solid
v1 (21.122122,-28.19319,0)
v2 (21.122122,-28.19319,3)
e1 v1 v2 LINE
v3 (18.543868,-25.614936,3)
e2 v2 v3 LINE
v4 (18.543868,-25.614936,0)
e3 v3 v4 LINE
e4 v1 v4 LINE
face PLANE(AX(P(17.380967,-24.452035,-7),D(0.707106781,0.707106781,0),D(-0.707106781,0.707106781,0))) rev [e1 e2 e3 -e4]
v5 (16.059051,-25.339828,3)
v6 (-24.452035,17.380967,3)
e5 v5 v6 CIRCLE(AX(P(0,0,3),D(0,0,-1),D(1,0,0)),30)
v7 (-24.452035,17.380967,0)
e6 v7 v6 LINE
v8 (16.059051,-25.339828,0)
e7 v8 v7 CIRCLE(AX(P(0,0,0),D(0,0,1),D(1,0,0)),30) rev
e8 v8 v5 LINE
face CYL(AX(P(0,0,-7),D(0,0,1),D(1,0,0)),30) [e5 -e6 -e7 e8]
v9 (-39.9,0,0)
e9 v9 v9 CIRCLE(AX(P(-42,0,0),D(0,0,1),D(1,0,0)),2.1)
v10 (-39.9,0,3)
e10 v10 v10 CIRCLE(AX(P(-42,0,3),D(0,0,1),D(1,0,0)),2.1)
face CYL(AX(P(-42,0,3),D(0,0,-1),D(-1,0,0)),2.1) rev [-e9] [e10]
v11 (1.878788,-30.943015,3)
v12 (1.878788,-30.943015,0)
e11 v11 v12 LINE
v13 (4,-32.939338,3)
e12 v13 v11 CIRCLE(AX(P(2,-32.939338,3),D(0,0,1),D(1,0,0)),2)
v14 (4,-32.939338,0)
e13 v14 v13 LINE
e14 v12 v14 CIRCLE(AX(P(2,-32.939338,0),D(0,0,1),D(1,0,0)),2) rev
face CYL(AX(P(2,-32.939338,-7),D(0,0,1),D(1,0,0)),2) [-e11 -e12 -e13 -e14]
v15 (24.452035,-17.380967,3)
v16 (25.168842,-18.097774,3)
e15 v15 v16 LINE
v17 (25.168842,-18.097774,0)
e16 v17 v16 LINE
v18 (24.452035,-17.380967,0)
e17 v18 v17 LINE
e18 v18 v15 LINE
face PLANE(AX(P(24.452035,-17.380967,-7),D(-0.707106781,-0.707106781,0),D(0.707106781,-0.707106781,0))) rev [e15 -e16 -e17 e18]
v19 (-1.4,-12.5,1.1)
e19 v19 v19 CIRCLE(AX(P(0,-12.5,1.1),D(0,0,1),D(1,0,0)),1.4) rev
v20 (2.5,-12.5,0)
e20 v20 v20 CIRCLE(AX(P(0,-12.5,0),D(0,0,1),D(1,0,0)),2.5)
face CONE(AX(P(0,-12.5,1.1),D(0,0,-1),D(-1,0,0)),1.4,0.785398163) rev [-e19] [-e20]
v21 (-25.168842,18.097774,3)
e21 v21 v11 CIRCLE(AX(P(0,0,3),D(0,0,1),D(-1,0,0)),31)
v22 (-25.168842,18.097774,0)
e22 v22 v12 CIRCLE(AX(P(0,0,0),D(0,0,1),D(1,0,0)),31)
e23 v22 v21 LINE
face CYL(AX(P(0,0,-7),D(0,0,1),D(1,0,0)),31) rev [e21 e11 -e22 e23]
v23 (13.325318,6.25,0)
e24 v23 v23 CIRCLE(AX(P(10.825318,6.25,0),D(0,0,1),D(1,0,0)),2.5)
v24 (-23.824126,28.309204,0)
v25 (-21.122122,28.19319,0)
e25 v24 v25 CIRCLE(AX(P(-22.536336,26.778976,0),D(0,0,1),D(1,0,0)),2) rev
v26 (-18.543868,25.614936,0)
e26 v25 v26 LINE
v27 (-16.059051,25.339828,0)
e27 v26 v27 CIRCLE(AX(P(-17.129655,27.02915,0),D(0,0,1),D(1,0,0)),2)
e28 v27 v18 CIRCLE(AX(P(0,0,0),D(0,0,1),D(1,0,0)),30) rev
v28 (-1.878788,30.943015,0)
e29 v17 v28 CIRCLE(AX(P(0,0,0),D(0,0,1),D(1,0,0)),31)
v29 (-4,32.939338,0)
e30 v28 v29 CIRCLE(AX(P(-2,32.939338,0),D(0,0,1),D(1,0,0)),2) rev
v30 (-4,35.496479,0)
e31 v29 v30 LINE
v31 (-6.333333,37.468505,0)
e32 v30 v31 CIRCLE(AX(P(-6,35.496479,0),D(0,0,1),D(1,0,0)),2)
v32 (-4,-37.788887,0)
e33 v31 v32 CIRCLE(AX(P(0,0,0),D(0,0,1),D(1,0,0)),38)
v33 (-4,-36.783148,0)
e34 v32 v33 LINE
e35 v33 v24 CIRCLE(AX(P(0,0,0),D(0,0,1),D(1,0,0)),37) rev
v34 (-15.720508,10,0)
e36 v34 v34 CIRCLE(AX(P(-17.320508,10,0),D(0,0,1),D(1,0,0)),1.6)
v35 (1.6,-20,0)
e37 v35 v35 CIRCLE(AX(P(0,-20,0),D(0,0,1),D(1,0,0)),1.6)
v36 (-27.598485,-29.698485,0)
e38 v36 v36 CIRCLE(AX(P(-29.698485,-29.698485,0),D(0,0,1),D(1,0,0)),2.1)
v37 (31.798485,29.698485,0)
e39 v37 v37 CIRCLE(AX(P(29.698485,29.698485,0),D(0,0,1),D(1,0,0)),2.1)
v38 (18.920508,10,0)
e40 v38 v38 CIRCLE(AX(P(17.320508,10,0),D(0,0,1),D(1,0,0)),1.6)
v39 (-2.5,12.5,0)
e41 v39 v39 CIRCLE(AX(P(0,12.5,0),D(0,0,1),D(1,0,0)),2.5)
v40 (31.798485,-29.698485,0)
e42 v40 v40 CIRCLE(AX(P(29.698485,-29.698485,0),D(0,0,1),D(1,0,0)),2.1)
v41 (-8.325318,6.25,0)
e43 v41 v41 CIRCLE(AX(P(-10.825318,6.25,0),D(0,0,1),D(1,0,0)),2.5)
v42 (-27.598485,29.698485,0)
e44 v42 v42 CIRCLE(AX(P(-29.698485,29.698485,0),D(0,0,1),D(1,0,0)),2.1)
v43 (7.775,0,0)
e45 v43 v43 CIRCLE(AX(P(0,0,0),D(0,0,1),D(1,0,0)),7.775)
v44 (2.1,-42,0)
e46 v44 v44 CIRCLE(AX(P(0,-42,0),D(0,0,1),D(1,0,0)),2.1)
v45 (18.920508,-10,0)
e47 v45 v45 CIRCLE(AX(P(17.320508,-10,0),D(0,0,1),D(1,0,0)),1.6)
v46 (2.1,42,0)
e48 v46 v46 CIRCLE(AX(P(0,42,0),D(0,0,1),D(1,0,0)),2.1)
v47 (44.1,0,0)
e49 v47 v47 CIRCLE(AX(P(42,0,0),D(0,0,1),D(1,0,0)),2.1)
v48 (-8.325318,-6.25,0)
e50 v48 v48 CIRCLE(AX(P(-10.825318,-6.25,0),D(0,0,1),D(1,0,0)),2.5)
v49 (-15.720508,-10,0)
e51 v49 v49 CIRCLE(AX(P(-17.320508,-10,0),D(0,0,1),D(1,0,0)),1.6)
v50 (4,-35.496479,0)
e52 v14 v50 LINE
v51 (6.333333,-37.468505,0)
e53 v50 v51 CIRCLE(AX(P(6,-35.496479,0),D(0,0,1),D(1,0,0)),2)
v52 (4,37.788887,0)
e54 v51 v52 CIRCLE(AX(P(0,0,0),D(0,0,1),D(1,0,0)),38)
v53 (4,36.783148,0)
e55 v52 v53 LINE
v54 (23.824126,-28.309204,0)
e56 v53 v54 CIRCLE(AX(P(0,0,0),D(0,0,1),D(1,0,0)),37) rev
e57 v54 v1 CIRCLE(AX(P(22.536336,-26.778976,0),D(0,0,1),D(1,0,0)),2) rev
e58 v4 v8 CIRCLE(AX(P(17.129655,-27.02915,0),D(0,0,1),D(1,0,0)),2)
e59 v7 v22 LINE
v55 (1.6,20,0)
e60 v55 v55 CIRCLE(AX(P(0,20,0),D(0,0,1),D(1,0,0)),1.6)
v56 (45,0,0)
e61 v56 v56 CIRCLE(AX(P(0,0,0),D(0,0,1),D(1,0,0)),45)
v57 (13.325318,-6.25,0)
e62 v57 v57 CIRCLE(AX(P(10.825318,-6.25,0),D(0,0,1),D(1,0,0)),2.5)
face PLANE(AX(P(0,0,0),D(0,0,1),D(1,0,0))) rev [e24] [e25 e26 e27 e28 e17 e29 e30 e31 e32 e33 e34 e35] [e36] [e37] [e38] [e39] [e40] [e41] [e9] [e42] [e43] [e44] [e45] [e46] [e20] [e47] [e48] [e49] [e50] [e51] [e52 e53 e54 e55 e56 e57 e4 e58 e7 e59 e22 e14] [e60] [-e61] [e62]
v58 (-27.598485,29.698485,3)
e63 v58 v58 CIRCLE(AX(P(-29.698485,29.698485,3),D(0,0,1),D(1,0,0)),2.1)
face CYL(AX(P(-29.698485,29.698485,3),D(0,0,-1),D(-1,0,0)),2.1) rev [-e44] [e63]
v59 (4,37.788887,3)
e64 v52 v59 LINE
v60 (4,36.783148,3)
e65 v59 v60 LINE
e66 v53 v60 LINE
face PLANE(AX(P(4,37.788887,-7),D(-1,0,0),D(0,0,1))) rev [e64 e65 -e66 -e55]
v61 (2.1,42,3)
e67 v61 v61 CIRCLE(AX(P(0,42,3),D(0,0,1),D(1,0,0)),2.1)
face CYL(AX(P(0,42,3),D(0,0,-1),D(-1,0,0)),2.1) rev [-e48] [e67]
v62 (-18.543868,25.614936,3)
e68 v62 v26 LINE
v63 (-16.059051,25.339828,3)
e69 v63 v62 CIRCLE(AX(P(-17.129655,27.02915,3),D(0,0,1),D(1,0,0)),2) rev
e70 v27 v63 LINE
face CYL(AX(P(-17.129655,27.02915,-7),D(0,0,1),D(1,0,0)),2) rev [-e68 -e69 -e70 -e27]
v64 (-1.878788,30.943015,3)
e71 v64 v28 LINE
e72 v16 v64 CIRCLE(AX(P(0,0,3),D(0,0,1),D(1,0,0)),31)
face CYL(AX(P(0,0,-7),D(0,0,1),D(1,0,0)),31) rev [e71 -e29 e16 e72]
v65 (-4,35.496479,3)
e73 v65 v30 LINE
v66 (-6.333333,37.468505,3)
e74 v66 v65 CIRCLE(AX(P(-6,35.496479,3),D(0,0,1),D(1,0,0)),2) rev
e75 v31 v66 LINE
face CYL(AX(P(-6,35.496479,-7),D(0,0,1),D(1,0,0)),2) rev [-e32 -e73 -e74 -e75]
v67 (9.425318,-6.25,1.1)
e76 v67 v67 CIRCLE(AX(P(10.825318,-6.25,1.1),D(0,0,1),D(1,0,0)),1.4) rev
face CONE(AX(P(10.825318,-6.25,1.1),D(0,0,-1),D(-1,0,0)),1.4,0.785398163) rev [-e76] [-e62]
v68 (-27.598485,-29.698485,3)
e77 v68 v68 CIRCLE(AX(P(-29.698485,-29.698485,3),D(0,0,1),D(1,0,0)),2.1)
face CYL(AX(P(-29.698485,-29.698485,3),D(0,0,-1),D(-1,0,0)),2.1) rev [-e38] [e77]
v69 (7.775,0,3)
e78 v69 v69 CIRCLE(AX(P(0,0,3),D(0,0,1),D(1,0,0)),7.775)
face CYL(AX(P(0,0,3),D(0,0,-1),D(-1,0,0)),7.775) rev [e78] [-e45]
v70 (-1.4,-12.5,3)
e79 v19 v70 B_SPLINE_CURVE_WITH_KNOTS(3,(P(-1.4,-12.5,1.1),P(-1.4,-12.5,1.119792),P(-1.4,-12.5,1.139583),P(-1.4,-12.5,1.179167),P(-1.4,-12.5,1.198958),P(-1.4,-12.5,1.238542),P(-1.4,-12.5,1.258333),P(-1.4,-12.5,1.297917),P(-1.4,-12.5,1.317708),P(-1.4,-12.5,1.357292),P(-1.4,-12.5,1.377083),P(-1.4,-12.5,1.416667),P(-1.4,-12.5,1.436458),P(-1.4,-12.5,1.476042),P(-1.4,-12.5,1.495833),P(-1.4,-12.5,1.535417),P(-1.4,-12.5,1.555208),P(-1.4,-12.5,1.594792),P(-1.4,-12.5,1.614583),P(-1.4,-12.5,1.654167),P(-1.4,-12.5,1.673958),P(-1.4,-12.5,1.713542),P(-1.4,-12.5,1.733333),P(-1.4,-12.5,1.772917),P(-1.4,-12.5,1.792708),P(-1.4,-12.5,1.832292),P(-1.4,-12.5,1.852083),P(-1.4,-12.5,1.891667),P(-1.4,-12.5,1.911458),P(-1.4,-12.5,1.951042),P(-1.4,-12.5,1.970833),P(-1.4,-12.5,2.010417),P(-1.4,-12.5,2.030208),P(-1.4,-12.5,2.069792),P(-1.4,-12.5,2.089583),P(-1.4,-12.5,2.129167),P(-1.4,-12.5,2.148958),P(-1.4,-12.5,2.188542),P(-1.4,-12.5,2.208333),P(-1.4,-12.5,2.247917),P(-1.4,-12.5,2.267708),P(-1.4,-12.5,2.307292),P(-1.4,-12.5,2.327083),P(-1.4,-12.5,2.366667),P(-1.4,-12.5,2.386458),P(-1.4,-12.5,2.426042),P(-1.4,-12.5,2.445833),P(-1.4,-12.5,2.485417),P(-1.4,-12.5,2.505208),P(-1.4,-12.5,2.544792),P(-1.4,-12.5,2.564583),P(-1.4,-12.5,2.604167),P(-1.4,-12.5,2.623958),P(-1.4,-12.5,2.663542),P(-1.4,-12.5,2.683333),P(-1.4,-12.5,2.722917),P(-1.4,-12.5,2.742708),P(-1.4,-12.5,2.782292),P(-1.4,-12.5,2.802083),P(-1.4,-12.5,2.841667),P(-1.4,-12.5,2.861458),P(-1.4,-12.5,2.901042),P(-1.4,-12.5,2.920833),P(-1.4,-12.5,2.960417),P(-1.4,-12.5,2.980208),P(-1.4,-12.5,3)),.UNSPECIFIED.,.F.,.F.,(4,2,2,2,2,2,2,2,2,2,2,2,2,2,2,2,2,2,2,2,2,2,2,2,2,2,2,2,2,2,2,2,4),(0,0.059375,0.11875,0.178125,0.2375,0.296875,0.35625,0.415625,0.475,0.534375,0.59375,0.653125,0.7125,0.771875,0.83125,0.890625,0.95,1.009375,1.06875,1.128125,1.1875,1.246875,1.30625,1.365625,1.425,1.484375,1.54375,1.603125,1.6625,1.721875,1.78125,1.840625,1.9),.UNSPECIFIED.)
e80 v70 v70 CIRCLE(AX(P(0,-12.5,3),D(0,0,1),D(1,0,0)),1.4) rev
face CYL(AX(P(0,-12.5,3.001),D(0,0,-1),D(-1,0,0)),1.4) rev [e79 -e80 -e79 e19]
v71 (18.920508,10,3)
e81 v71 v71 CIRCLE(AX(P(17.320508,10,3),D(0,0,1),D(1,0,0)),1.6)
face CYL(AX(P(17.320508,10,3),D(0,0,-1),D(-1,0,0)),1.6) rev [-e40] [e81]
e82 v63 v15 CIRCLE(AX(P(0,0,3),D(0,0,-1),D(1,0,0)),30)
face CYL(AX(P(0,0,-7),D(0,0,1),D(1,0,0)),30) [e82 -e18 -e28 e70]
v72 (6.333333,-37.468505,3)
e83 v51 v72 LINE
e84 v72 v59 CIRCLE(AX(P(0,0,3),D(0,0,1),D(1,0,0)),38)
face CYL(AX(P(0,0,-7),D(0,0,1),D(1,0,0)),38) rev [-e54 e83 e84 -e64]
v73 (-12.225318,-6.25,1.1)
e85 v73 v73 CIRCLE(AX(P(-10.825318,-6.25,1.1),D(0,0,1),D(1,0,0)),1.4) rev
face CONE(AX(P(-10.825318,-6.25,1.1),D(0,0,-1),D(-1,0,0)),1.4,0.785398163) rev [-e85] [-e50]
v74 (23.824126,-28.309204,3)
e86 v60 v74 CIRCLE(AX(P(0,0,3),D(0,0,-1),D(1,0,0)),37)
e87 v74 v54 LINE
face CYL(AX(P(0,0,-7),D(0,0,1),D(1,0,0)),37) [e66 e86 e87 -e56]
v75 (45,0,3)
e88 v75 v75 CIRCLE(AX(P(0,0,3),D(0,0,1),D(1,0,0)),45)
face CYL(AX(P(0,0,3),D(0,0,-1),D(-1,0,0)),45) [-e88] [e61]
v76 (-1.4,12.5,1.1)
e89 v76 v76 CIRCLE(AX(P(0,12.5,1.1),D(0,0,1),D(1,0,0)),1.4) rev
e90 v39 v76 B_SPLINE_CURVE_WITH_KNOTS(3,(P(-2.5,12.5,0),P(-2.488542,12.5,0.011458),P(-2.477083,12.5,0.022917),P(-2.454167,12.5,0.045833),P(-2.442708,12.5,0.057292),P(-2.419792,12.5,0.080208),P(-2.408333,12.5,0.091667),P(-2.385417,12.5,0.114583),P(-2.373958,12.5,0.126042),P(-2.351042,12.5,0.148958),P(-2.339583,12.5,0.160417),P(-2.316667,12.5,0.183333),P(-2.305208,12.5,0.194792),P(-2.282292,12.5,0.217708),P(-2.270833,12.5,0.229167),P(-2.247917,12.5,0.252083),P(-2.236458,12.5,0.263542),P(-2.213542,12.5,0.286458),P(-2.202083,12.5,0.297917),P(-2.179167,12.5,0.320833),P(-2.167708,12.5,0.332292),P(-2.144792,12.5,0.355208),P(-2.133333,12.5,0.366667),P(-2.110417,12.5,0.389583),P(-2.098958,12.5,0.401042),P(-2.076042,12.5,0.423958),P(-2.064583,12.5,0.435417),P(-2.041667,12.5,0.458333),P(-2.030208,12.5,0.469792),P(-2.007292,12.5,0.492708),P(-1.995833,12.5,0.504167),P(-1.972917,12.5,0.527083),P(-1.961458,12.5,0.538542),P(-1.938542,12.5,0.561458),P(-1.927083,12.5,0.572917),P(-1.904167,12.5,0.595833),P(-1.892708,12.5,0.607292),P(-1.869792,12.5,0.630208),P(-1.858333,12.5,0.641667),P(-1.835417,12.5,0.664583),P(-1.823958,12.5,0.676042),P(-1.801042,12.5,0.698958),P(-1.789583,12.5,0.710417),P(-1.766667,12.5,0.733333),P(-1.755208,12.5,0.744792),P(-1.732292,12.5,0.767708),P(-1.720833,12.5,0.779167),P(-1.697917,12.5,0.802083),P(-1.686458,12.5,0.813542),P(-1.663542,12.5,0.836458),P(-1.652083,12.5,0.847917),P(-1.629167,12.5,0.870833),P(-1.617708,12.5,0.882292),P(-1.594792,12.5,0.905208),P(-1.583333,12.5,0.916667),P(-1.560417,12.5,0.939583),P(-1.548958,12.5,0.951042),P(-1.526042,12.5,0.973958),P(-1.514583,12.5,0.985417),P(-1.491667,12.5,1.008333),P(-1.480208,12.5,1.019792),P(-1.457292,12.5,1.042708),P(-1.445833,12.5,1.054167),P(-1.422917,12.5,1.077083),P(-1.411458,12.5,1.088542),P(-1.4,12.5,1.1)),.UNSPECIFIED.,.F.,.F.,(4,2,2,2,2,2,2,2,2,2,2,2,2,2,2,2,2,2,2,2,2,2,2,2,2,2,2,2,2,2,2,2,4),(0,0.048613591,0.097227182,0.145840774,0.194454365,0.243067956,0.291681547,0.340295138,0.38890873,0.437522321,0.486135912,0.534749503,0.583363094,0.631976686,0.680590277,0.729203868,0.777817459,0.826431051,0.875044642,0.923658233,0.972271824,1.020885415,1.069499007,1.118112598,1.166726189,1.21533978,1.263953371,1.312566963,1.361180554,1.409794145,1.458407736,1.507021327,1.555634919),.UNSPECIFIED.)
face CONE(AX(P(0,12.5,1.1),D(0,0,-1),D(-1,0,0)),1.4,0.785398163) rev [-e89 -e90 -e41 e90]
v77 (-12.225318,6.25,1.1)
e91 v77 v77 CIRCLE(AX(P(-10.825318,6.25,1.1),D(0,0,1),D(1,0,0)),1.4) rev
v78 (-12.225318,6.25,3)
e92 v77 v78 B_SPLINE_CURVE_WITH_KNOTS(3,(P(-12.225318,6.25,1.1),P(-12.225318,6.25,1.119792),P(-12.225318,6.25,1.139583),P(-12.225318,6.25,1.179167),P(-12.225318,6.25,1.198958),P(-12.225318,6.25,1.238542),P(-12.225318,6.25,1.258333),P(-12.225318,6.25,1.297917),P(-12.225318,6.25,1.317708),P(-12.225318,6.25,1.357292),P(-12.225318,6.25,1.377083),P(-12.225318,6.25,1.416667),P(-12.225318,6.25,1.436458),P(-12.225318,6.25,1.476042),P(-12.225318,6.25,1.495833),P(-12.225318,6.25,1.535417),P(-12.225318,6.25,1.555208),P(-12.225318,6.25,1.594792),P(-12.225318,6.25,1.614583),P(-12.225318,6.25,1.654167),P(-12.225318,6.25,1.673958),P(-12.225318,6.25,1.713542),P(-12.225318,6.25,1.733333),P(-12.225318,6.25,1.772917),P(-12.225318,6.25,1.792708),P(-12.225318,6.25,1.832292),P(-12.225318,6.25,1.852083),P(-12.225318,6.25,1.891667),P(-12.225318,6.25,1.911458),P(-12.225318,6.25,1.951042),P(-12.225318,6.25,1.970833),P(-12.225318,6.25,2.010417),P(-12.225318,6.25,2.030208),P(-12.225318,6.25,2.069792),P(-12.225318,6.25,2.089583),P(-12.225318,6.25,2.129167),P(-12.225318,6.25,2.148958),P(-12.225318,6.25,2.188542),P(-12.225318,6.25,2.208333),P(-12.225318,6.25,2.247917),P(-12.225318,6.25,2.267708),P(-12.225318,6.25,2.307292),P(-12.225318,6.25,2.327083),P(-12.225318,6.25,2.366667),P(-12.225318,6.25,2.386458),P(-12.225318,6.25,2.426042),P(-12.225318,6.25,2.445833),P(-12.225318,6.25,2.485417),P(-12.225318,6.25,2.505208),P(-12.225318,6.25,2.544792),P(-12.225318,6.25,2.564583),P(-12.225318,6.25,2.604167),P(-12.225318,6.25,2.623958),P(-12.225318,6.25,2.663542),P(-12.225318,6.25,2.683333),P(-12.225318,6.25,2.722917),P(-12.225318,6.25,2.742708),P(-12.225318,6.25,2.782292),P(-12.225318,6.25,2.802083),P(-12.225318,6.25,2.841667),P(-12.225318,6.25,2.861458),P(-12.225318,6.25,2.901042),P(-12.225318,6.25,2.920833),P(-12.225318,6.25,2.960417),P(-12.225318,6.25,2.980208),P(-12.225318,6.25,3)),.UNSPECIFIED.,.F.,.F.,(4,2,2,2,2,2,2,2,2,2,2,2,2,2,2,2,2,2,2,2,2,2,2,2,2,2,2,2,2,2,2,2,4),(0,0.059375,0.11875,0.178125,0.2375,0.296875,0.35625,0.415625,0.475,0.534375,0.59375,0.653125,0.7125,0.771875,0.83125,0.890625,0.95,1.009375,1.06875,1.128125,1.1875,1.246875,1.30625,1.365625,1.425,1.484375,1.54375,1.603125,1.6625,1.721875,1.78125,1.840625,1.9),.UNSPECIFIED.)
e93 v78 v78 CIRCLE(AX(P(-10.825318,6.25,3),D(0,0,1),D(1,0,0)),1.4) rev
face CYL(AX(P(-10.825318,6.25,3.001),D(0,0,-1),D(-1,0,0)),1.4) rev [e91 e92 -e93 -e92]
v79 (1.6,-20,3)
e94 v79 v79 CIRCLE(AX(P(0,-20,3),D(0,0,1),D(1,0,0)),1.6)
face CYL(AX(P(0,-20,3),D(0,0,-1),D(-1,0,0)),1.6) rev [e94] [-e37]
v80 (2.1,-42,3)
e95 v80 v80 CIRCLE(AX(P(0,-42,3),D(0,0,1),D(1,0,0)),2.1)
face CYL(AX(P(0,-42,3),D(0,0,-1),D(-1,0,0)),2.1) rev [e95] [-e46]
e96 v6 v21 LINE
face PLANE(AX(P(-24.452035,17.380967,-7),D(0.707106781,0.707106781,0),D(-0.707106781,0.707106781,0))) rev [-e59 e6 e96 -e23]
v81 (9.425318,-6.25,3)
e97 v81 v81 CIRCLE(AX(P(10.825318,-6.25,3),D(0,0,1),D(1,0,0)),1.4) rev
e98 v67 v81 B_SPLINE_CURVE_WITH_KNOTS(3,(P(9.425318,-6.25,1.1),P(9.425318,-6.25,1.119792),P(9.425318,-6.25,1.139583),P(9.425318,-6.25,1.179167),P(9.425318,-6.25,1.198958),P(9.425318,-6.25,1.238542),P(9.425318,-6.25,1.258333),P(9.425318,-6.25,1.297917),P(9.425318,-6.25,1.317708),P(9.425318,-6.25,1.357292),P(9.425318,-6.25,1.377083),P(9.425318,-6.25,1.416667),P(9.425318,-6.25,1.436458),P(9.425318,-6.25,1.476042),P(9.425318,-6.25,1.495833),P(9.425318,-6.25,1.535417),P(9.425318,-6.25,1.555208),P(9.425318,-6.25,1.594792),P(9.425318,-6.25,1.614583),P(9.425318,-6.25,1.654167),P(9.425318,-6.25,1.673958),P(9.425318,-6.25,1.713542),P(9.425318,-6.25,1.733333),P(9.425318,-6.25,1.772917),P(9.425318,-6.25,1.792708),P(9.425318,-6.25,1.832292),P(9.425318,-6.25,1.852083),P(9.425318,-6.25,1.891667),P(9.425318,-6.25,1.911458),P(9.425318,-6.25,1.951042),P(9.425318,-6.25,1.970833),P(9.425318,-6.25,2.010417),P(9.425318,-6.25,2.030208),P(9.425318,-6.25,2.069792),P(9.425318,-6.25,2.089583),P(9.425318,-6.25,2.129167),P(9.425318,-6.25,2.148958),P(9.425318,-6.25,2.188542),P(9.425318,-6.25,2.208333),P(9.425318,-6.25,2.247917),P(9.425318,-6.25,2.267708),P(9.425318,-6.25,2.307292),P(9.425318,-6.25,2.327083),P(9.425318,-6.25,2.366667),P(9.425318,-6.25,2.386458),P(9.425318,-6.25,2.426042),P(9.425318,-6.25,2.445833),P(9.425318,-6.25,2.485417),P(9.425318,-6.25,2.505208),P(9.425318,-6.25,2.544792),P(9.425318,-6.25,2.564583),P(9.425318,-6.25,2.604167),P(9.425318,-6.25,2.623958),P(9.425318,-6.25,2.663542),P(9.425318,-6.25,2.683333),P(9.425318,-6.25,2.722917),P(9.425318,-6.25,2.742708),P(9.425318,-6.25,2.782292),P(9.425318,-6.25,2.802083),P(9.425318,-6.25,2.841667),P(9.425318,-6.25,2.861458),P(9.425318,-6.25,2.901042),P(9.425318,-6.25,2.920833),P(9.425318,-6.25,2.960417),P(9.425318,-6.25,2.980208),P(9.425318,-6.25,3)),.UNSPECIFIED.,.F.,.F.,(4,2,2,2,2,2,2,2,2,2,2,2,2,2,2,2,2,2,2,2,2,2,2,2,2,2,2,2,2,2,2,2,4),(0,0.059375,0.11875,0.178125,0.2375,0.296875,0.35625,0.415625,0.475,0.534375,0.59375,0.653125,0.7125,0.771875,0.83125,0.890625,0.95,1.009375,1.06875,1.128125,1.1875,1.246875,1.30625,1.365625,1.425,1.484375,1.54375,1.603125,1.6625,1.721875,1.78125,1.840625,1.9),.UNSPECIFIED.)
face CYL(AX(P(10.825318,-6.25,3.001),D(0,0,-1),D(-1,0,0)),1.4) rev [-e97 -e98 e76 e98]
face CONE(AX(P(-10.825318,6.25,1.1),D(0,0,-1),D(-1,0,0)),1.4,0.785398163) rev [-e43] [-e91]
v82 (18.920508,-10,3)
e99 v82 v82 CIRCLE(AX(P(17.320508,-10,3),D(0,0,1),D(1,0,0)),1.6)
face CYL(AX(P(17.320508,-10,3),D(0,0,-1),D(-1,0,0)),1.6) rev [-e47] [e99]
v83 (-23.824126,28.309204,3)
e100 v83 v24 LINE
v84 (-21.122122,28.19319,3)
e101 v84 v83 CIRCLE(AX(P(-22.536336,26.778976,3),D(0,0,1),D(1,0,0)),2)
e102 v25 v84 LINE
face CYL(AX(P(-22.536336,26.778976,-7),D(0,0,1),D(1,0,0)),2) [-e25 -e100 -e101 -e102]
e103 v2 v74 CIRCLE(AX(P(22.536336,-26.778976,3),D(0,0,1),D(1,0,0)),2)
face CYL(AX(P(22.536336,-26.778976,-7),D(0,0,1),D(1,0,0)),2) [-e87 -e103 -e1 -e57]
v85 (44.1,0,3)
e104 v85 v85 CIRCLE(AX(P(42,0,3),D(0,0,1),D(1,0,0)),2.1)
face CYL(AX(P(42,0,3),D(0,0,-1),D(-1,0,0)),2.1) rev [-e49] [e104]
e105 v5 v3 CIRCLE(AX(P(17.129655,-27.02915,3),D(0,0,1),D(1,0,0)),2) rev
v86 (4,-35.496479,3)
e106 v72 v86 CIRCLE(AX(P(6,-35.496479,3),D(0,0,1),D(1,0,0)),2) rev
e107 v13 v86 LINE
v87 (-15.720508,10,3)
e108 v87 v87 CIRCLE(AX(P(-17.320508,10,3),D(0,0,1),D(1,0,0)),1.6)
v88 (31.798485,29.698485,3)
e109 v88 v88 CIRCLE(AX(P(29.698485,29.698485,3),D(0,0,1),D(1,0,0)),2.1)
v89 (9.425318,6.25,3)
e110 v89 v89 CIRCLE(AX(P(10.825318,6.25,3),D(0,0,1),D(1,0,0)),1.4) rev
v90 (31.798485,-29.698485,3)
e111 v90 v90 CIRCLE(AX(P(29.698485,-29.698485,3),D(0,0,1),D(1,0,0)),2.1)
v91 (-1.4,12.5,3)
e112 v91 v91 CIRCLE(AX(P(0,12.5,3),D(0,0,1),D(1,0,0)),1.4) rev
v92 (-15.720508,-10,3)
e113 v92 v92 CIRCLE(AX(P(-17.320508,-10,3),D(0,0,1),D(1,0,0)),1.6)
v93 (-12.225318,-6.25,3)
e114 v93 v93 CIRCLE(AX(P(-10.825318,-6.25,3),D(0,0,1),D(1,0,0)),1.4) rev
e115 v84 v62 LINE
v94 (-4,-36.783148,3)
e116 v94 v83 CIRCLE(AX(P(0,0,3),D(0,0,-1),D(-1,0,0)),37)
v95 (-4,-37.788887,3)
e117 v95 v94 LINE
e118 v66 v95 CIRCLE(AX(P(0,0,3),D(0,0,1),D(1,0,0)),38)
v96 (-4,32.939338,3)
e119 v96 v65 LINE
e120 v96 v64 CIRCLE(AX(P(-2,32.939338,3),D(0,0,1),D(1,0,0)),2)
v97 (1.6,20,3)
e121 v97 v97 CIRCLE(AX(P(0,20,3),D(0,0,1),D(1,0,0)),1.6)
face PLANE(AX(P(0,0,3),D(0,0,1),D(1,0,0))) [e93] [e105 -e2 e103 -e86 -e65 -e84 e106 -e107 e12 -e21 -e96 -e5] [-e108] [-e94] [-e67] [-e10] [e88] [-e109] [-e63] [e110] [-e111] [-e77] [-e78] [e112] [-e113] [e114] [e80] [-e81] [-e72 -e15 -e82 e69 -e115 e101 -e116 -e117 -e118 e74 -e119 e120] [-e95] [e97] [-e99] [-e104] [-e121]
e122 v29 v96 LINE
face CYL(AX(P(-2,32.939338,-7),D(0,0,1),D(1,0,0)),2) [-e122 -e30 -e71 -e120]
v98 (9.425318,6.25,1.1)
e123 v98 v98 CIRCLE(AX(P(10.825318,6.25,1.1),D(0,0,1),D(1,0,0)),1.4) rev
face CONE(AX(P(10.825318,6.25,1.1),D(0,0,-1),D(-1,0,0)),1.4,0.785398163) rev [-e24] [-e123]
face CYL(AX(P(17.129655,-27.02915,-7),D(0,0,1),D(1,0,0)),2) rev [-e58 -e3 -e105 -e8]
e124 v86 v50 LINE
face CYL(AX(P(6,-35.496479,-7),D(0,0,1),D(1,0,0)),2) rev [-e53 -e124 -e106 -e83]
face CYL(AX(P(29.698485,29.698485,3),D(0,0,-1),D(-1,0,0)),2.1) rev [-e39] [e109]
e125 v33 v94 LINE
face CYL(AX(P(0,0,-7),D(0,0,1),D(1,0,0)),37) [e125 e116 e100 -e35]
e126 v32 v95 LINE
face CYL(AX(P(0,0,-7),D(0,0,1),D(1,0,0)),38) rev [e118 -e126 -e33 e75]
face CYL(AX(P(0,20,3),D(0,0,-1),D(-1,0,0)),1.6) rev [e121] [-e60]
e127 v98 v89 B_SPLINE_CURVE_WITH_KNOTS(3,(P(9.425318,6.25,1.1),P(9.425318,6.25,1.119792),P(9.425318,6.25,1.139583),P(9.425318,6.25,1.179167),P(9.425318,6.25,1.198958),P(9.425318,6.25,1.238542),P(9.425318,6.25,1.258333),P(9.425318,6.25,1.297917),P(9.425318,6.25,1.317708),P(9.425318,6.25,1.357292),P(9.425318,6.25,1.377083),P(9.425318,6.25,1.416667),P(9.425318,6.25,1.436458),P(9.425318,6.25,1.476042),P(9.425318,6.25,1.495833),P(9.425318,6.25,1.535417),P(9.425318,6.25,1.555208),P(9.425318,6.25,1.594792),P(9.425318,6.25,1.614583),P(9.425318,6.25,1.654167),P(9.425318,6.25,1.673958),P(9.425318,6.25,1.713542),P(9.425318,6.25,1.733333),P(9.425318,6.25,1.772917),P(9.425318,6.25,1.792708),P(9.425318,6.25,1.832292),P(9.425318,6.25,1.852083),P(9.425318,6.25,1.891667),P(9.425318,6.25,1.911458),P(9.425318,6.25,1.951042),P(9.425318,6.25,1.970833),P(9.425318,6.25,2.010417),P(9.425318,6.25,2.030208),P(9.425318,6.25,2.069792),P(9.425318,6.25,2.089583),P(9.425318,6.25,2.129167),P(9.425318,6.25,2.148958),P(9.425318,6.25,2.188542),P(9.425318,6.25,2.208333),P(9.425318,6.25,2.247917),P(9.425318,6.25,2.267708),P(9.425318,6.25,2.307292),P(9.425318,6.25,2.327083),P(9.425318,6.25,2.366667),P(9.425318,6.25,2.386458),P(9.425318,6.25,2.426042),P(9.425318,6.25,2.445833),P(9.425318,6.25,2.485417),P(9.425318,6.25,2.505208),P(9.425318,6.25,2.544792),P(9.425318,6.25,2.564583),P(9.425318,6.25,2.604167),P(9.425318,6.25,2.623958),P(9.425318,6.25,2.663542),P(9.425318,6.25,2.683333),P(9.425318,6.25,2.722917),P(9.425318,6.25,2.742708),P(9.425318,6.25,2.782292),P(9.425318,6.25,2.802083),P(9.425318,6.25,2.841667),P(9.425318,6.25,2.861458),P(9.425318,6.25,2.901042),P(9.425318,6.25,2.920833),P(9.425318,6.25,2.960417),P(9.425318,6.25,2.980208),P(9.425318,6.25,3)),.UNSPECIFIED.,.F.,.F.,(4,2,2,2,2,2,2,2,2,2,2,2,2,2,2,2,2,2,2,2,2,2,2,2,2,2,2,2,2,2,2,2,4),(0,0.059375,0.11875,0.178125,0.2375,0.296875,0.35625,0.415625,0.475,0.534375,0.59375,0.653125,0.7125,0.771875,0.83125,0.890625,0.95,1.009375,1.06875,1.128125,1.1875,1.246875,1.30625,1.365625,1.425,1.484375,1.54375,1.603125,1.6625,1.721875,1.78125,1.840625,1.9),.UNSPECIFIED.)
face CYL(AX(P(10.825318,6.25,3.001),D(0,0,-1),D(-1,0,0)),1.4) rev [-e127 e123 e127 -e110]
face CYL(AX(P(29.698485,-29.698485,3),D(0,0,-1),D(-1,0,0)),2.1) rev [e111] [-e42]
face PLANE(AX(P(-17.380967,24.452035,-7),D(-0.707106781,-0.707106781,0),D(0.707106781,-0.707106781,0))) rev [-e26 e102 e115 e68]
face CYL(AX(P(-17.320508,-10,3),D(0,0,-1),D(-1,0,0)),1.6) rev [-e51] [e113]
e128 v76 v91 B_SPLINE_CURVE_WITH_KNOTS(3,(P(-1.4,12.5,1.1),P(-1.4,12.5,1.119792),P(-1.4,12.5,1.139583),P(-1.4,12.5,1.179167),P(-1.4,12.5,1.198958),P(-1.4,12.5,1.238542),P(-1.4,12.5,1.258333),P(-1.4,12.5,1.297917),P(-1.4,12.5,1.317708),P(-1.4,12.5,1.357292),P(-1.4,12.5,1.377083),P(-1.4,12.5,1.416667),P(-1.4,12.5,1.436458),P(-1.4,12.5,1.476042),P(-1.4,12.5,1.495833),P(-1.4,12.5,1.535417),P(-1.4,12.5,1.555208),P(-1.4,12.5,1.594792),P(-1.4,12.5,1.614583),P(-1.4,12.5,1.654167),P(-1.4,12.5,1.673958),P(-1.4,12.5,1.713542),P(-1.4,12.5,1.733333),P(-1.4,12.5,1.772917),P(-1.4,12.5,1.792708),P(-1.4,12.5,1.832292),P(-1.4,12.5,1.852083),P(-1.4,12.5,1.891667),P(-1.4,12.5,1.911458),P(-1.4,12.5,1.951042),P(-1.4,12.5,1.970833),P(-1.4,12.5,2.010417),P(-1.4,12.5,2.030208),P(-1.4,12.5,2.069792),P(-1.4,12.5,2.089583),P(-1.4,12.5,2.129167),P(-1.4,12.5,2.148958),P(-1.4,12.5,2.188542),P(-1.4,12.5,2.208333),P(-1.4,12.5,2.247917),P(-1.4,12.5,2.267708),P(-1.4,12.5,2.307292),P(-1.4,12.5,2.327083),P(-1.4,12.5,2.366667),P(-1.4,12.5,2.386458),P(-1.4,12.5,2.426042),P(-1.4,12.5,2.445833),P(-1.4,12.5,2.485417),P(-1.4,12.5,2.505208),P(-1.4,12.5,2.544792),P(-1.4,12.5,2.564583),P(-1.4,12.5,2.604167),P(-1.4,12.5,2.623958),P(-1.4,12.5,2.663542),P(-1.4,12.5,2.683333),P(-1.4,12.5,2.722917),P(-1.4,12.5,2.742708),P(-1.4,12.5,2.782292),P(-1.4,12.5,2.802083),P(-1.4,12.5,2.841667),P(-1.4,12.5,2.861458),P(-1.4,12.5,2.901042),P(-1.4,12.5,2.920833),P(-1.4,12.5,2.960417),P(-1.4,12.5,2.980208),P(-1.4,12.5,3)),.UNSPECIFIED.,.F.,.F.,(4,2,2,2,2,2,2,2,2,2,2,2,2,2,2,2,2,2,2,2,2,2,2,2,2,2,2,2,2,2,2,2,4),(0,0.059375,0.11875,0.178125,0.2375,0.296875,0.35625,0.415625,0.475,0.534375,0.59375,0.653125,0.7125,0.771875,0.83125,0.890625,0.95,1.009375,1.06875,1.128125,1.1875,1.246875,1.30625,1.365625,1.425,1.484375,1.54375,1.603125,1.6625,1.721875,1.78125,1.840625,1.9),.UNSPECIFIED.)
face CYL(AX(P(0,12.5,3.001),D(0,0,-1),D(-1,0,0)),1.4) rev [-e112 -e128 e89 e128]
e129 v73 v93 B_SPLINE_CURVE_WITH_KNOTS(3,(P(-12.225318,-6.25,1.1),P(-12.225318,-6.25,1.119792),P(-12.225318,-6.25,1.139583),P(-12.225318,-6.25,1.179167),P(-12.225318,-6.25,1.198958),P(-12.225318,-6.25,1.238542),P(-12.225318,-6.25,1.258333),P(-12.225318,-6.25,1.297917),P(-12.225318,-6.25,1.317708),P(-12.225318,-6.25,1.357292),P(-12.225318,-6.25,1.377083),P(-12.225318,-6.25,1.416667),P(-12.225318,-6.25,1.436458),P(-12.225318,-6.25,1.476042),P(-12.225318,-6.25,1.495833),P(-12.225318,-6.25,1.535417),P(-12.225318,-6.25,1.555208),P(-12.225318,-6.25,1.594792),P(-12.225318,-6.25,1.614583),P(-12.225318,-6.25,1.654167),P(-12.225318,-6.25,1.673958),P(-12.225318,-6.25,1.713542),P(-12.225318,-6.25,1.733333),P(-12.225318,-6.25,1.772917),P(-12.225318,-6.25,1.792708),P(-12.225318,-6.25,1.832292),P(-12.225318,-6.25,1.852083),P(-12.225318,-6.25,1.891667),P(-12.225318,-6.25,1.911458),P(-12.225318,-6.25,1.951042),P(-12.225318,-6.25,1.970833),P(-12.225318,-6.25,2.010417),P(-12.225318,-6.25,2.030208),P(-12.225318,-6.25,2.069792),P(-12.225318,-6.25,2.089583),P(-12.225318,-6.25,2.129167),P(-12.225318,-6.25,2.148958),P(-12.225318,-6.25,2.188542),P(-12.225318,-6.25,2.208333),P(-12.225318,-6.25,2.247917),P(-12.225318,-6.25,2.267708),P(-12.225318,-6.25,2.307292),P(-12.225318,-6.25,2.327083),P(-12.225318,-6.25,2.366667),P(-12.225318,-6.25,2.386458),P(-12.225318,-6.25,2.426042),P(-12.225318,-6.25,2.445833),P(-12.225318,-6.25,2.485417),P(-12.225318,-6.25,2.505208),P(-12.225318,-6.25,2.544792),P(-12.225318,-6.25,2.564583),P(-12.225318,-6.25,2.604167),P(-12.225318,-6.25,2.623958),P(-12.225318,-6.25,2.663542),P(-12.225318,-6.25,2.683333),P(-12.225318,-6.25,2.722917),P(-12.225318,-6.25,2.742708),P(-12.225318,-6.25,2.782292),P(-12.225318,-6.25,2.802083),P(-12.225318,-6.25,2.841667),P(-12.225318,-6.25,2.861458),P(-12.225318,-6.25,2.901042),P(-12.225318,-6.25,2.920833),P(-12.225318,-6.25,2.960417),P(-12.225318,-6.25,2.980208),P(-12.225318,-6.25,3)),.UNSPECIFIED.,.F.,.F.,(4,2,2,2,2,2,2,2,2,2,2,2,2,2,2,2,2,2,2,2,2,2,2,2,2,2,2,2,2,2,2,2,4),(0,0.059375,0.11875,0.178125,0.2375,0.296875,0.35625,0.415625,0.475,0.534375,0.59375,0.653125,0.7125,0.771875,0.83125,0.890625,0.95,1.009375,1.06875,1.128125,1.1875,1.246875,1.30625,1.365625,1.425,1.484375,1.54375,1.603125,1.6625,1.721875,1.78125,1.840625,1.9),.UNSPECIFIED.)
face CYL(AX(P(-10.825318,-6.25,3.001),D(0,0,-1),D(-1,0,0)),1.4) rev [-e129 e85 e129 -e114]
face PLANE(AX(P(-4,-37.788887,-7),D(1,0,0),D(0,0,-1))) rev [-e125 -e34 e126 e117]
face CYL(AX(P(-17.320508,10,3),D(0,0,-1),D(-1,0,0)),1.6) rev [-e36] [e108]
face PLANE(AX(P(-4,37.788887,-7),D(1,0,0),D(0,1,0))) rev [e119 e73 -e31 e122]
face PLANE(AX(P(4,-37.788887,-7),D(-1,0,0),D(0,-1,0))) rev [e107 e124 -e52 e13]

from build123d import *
from build123d.topology import SkipClean

# Parameters (mm, degrees)
EXTRUDE_1_OUTLINE_R      = 45
EXTRUDE_1_OUTLINE_R_2    = 2.1
EXTRUDE_1_OUTLINE_R_3    = 1.6
EXTRUDE_1_OUTLINE_R_4    = 7.775
EXTRUDE_1_DEPTH          = 3
CUT_EXTRUDE_1_DEPTH      = 10
PATTERN_CIRCULAR_1_COUNT = 2
CUT_EXTRUDE_2_DEPTH      = 10
FILLET_1_R               = 2
CUT_EXTRUDE_3_REACH      = 65.71
SKETCH_4_R               = 1.4
CHAMFER_1_SIZE           = 1.1


# Read off the part's stored shape, not the designer's step: 凸台-拉伸1
with BuildPart() as part:
    # 凸台-拉伸1 outline → 凸台-拉伸1 (new body)
    with BuildSketch(Plane.XY):
        Circle(EXTRUDE_1_OUTLINE_R)
        with Locations((-29.69848481, -29.69848481)):
            Circle(EXTRUDE_1_OUTLINE_R_2, mode=Mode.SUBTRACT)
        with Locations((-17.320508076, -10)):
            Circle(EXTRUDE_1_OUTLINE_R_3, mode=Mode.SUBTRACT)
        with Locations((0, -42)):
            Circle(EXTRUDE_1_OUTLINE_R_2, mode=Mode.SUBTRACT)
        with Locations((29.69848481, -29.69848481)):
            Circle(EXTRUDE_1_OUTLINE_R_2, mode=Mode.SUBTRACT)
        with Locations((0, -20)):
            Circle(EXTRUDE_1_OUTLINE_R_3, mode=Mode.SUBTRACT)
        with Locations((17.320508076, -10)):
            Circle(EXTRUDE_1_OUTLINE_R_3, mode=Mode.SUBTRACT)
        with Locations((-42, 0)):
            Circle(EXTRUDE_1_OUTLINE_R_2, mode=Mode.SUBTRACT)
        with Locations((-17.320508076, 10)):
            Circle(EXTRUDE_1_OUTLINE_R_3, mode=Mode.SUBTRACT)
        with Locations((-29.69848481, 29.69848481)):
            Circle(EXTRUDE_1_OUTLINE_R_2, mode=Mode.SUBTRACT)
        Circle(EXTRUDE_1_OUTLINE_R_4, mode=Mode.SUBTRACT)
        with Locations((17.320508076, 10)):
            Circle(EXTRUDE_1_OUTLINE_R_3, mode=Mode.SUBTRACT)
        with Locations((0, 20)):
            Circle(EXTRUDE_1_OUTLINE_R_3, mode=Mode.SUBTRACT)
        with Locations((42, 0)):
            Circle(EXTRUDE_1_OUTLINE_R_2, mode=Mode.SUBTRACT)
        with Locations((0, 42)):
            Circle(EXTRUDE_1_OUTLINE_R_2, mode=Mode.SUBTRACT)
        with Locations((29.69848481, 29.69848481)):
            Circle(EXTRUDE_1_OUTLINE_R_2, mode=Mode.SUBTRACT)
    extrude(amount=EXTRUDE_1_DEPTH)

    # 草图2 → 切除-拉伸1 (cut)
    with BuildSketch(Plane.XY.offset(3)):
        with BuildLine():
            Line((4, 37.788887255), (4, 36.783148315))
            ThreePointArc((4, 36.783148315), (35.651970274, 9.896313233), (22.387428888, -29.4584967))
            Line((22.387428888, -29.4584967), (17.380966757, -24.452034569))
            ThreePointArc((17.380966757, -24.452034569), (16.963906124, -24.743198844), (16.541969004, -25.027250378))
            Line((16.541969004, -25.027250378), (22.290357636, -30.77563901))
            ThreePointArc((22.290357636, -30.77563901), (36.716063128, 9.794422308), (4, 37.788887255))
        make_face()
        with BuildLine():
            Line((-4, 37.788887255), (-4, 30.740852298))
            ThreePointArc((-4, 30.740852298), (26.614522572, 15.895508431), (25.168841559, -18.097773747))
            Line((25.168841559, -18.097773747), (24.452034569, -17.380966757))
            ThreePointArc((24.452034569, -17.380966757), (25.41530796, 15.93932625), (-5, 29.580398915))
            Line((-5, 29.580398915), (-5, 37.669616404))
            ThreePointArc((-5, 37.669616404), (-4.500395136, 37.732564763), (-4, 37.788887255))
        make_face()
    cut_extrude_1 = extrude(amount=-CUT_EXTRUDE_1_DEPTH, mode=Mode.SUBTRACT)

    # 阵列(圆周)1: 切除-拉伸1 ×2 about axis
    pattern_circular_1_axis = Axis((0, 0, 0), (0, 0, 1))
    for i in range(1, PATTERN_CIRCULAR_1_COUNT):
        add(cut_extrude_1.rotate(pattern_circular_1_axis, i * 360 / PATTERN_CIRCULAR_1_COUNT), mode=Mode.SUBTRACT)

    # 草图3 → 切除-拉伸2 (cut)
    with SkipClean():  # the faces are left unmerged after this step: merging them gives an invalid solid
        with BuildSketch(Plane.XY.offset(3)):
            with BuildLine():
                Line((-5, 37.669616404), (-5, 29.580398915))
                ThreePointArc((-5, 29.580398915), (-11.00894625, 27.907043958), (-16.541969004, 25.027250378))
                Line((-16.541969004, 25.027250378), (-22.290357636, 30.77563901))
                ThreePointArc((-22.290357636, 30.77563901), (-14.073828052, 35.297696298), (-5, 37.669616404))
            make_face()
            with BuildLine():
                Line((16.541969004, -25.027250378), (22.290357636, -30.77563901))
                ThreePointArc((22.290357636, -30.77563901), (14.073828052, -35.297696298), (5, -37.669616404))
                Line((5, -37.669616404), (5, -29.580398915))
                ThreePointArc((5, -29.580398915), (11.00894625, -27.907043958), (16.541969004, -25.027250378))
            make_face()
        extrude(amount=-CUT_EXTRUDE_2_DEPTH, mode=Mode.SUBTRACT)

    # 圆角1
    fillet_1_edges = [part.edges().sort_by_distance(p)[0] for p in [
        (4, -37.788887255, 1.5),
        (4, -30.740852298, 1.5),
        (-17.380966757, 24.452034569, 1.5),
        (-22.387428888, 29.4584967, 1.5),
        (-4, 37.788887255, 1.5),
        (-4, 30.740852298, 1.5),
        (17.380966757, -24.452034569, 1.5),
        (22.387428888, -29.4584967, 1.5),
    ]]
    fillet(fillet_1_edges, radius=FILLET_1_R)

    # 草图4 → 切除-拉伸3 (cut, up to next)
    with BuildSketch(Plane(origin=(0, 0, 0), x_dir=(-1, 0, 0), z_dir=(0, 0, -1)), mode=Mode.PRIVATE) as cut_extrude_3_sk1:
        with Locations((0, 12.5)):
            Circle(SKETCH_4_R)
    cut_extrude_3_tool1 = extrude(cut_extrude_3_sk1.sketch, amount=-CUT_EXTRUDE_3_REACH, mode=Mode.PRIVATE) & part.part
    # 草图4 → 切除-拉伸3 (cut, up to next)
    with BuildSketch(Plane(origin=(0, 0, 0), x_dir=(-1, 0, 0), z_dir=(0, 0, -1)), mode=Mode.PRIVATE) as cut_extrude_3_sk2:
        with Locations((10.825317547, 6.25)):
            Circle(SKETCH_4_R)
    cut_extrude_3_tool2 = extrude(cut_extrude_3_sk2.sketch, amount=-CUT_EXTRUDE_3_REACH, mode=Mode.PRIVATE) & part.part
    # 草图4 → 切除-拉伸3 (cut, up to next)
    with BuildSketch(Plane(origin=(0, 0, 0), x_dir=(-1, 0, 0), z_dir=(0, 0, -1)), mode=Mode.PRIVATE) as cut_extrude_3_sk3:
        with Locations((10.825317547, -6.25)):
            Circle(SKETCH_4_R)
    cut_extrude_3_tool3 = extrude(cut_extrude_3_sk3.sketch, amount=-CUT_EXTRUDE_3_REACH, mode=Mode.PRIVATE) & part.part
    # 草图4 → 切除-拉伸3 (cut, up to next)
    with BuildSketch(Plane(origin=(0, 0, 0), x_dir=(-1, 0, 0), z_dir=(0, 0, -1)), mode=Mode.PRIVATE) as cut_extrude_3_sk4:
        with Locations((0, -12.5)):
            Circle(SKETCH_4_R)
    cut_extrude_3_tool4 = extrude(cut_extrude_3_sk4.sketch, amount=-CUT_EXTRUDE_3_REACH, mode=Mode.PRIVATE) & part.part
    # 草图4 → 切除-拉伸3 (cut, up to next)
    with BuildSketch(Plane(origin=(0, 0, 0), x_dir=(-1, 0, 0), z_dir=(0, 0, -1)), mode=Mode.PRIVATE) as cut_extrude_3_sk5:
        with Locations((-10.825317547, -6.25)):
            Circle(SKETCH_4_R)
    cut_extrude_3_tool5 = extrude(cut_extrude_3_sk5.sketch, amount=-CUT_EXTRUDE_3_REACH, mode=Mode.PRIVATE) & part.part
    # 草图4 → 切除-拉伸3 (cut, up to next)
    with BuildSketch(Plane(origin=(0, 0, 0), x_dir=(-1, 0, 0), z_dir=(0, 0, -1)), mode=Mode.PRIVATE) as cut_extrude_3_sk6:
        with Locations((-10.825317547, 6.25)):
            Circle(SKETCH_4_R)
    cut_extrude_3_tool6 = extrude(cut_extrude_3_sk6.sketch, amount=-CUT_EXTRUDE_3_REACH, mode=Mode.PRIVATE) & part.part
    add(cut_extrude_3_tool1.solids().sort_by_distance((0, 12.5, 0))[0], mode=Mode.SUBTRACT)
    add(cut_extrude_3_tool2.solids().sort_by_distance((-10.825318, 6.25, 0))[0], mode=Mode.SUBTRACT)
    add(cut_extrude_3_tool3.solids().sort_by_distance((-10.825318, -6.25, 0))[0], mode=Mode.SUBTRACT)
    add(cut_extrude_3_tool4.solids().sort_by_distance((0, -12.5, 0))[0], mode=Mode.SUBTRACT)
    add(cut_extrude_3_tool5.solids().sort_by_distance((10.825318, -6.25, 0))[0], mode=Mode.SUBTRACT)
    add(cut_extrude_3_tool6.solids().sort_by_distance((10.825318, 6.25, 0))[0], mode=Mode.SUBTRACT)

    # 倒角1
    chamfer_1_edges = [part.edges().sort_by_distance(p)[0] for p in [
        (1.4, 12.5, 0),
        (12.225317547, 6.25, 0),
        (12.225317547, -6.25, 0),
        (1.4, -12.5, 0),
        (-9.425317547, -6.25, 0),
        (-9.425317547, 6.25, 0),
    ]]
    chamfer(chamfer_1_edges, length=CHAMFER_1_SIZE)


solid = part.part
